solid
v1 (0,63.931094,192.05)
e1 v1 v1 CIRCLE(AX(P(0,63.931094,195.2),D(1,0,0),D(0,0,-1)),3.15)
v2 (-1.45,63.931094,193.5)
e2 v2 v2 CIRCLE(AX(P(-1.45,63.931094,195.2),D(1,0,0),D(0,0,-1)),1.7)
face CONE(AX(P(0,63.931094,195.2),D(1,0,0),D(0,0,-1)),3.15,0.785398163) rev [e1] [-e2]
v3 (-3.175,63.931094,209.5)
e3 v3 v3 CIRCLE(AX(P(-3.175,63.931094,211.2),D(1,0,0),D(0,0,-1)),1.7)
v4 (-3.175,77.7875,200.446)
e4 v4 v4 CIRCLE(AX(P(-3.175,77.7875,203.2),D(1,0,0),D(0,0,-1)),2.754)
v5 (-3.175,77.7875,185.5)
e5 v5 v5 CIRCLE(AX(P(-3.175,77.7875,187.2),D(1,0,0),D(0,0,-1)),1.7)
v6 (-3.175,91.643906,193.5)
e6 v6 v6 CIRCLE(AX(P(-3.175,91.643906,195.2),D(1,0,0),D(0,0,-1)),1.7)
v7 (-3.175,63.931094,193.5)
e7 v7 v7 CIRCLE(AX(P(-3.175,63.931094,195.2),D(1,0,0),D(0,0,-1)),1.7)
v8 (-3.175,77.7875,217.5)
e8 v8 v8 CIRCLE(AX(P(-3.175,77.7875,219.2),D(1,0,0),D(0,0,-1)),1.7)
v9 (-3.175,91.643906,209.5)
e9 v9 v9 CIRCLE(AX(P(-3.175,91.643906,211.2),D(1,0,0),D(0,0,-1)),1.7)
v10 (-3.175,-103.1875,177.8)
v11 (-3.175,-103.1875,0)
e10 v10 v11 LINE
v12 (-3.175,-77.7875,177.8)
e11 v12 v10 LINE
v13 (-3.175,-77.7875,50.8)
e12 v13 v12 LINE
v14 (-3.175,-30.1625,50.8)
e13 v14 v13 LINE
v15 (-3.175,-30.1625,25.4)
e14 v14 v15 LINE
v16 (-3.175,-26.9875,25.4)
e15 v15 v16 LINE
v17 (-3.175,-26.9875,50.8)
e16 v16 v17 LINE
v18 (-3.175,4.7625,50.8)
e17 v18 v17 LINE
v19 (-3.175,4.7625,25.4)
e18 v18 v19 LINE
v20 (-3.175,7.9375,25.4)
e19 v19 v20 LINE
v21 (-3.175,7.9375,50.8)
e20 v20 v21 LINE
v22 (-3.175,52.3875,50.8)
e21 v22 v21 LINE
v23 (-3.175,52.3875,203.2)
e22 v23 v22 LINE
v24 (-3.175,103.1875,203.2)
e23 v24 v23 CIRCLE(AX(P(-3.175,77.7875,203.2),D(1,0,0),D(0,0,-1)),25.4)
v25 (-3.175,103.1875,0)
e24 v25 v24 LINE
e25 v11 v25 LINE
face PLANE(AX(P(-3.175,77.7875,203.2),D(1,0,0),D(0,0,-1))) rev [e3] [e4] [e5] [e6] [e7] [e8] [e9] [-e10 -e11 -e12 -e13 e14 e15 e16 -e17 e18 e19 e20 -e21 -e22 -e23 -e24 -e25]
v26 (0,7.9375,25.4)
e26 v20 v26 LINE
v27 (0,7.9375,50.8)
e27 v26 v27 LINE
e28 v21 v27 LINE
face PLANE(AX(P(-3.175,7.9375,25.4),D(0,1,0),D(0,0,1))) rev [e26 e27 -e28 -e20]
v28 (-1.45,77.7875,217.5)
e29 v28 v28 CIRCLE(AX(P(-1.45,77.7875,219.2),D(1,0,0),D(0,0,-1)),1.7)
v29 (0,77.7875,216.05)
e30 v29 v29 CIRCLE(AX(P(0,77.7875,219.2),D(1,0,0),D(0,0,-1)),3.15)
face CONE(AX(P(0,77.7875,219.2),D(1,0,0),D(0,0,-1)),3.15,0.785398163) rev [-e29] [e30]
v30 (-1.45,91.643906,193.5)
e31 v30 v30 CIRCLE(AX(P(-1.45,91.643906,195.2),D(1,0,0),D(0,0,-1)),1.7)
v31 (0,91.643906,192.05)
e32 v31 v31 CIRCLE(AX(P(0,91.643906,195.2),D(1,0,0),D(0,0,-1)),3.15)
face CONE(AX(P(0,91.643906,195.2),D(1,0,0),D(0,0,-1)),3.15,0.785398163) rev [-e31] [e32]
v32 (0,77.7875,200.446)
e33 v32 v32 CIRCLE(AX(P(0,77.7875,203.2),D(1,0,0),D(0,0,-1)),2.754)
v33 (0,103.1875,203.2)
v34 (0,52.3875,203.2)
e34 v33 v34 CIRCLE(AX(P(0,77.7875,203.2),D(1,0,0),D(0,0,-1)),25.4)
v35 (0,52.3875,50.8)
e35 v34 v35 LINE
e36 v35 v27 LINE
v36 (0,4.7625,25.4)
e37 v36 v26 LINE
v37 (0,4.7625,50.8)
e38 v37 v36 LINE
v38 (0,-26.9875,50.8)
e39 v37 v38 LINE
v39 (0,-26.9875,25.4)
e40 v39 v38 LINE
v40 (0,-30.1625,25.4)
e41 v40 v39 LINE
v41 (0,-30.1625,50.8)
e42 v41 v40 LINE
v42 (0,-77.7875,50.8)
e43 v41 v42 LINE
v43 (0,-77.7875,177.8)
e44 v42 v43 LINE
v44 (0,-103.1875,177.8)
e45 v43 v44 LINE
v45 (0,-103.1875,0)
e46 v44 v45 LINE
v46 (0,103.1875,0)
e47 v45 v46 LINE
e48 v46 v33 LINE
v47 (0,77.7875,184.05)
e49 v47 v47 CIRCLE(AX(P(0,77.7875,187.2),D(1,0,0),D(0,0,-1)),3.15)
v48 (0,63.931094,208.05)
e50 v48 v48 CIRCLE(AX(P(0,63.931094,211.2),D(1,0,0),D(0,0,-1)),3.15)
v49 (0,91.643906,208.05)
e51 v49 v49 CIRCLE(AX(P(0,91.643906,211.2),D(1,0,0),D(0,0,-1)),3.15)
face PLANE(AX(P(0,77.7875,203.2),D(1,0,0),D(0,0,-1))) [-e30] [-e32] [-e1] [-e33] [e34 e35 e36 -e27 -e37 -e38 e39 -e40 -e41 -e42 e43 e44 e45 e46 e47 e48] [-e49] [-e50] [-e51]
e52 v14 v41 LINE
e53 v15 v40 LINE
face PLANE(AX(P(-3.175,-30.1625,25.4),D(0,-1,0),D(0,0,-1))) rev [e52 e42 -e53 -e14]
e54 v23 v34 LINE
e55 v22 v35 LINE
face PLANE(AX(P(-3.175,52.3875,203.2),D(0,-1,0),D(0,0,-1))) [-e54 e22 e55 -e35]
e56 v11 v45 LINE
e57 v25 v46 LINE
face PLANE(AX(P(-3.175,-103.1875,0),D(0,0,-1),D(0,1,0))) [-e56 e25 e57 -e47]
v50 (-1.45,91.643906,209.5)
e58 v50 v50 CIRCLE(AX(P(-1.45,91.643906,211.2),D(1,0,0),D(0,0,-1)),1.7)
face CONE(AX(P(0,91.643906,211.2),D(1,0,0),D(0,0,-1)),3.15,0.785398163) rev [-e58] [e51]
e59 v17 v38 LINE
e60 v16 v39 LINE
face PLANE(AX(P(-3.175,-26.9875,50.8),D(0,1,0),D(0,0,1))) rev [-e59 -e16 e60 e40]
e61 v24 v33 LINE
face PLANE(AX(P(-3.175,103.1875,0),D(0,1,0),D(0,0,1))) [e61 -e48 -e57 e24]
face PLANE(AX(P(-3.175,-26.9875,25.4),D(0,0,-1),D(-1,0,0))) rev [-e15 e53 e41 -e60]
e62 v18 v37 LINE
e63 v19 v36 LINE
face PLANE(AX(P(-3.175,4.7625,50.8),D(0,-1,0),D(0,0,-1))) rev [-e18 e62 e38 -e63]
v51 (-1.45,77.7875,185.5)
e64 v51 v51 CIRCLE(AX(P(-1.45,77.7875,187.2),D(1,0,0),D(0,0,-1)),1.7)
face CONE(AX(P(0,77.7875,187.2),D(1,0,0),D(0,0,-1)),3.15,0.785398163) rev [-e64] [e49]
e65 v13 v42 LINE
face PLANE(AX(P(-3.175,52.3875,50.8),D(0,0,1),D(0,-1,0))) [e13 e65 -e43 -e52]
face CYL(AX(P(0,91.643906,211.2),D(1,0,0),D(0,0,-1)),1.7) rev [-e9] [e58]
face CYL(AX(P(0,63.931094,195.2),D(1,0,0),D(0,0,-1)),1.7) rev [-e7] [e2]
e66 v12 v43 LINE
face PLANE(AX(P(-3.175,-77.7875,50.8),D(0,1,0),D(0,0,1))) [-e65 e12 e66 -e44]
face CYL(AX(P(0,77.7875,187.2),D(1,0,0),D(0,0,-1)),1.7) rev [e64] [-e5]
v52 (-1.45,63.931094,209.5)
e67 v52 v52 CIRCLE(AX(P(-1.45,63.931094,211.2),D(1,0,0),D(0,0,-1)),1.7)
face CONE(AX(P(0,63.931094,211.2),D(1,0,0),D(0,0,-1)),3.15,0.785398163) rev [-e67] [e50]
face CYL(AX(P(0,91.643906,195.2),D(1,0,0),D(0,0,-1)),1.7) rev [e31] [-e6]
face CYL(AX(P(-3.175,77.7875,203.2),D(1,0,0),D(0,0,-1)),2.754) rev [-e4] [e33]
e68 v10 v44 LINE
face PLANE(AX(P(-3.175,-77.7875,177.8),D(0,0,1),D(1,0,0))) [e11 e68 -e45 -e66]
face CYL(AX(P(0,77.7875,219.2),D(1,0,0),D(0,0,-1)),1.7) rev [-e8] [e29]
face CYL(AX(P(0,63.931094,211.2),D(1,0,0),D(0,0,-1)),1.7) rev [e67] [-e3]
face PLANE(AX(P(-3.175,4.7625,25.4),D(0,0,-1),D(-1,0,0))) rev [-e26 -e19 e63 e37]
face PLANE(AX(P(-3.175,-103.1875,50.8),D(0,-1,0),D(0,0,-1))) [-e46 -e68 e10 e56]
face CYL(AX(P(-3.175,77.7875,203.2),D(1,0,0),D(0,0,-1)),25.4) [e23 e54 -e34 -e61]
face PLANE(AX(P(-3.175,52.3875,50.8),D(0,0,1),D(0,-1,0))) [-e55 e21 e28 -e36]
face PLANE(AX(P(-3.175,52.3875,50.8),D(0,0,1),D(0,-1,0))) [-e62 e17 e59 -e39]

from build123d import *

# Parameters (mm, degrees)
BASE_FLANGE1_DEPTH                              = 3.175
SKETCH8_W                                       = 25.4
SKETCH8_H                                       = 3.175
CUT_EXTRUDE2_DEPTH                              = 251.830023684
SKETCH11_R                                      = 2.753999953
CUT_EXTRUDE4_DEPTH                              = 251.830023684
CSK_FOR_M3_FLAT_HEAD_MACHINE_SCREW1_D           = 3.4
CSK_FOR_M3_FLAT_HEAD_MACHINE_SCREW1_CSINK_D     = 6.3
CSK_FOR_M3_FLAT_HEAD_MACHINE_SCREW1_CSINK_ANGLE = 90


# Sheet-metal steps are written as plain solids
with BuildPart() as part:
    # Sketch1 → Base-Flange1 (new body)
    with BuildSketch(Plane(origin=(0, 0, 0), x_dir=(0, 0, -1), z_dir=(1, 0, 0))):
        with BuildLine():
            Line((0, -103.1875), (0, 103.1875))
            Line((0, 103.1875), (-203.2, 103.1875))
            ThreePointArc((-203.2, 103.1875), (-228.6, 77.7875), (-203.2, 52.3875))
            Line((-203.2, 52.3875), (-50.8, 52.3875))
            Line((-50.8, 52.3875), (-50.8, -77.7875))
            Line((-50.8, -77.7875), (-177.8, -77.7875))
            Line((-177.8, -77.7875), (-177.8, -103.1875))
            Line((-177.8, -103.1875), (-50.8, -103.1875))
            Line((-50.8, -103.1875), (0, -103.1875))
        make_face()
    extrude(amount=-BASE_FLANGE1_DEPTH)

    # Sketch8 → Cut-Extrude2 (cut, through all)
    with BuildSketch(Plane(origin=(0, 0, 0), x_dir=(0, 0, -1), z_dir=(1, 0, 0))):
        with Locations((-38.1, 6.35)):
            Rectangle(SKETCH8_W, SKETCH8_H)
        with Locations((-38.1, -28.575)):
            Rectangle(SKETCH8_W, SKETCH8_H)
    extrude(amount=-CUT_EXTRUDE2_DEPTH, mode=Mode.SUBTRACT)

    # Sketch11 → Cut-Extrude4 (cut, through all)
    with BuildSketch(Plane(origin=(0, 0, 0), x_dir=(0, 0, -1), z_dir=(1, 0, 0))):
        with Locations((-203.2, 77.7875)):
            Circle(SKETCH11_R)
    extrude(amount=-CUT_EXTRUDE4_DEPTH, mode=Mode.SUBTRACT)

    # CSK for M3 Flat Head Machine Screw1 (through all)
    with Locations(Plane(origin=(0, 0, 0), x_dir=(0, 0, -1), z_dir=(1, 0, 0))):
        with Locations((-211.2, 63.931093539), (-219.2, 77.7875), (-211.2, 91.643906461), (-195.2, 91.643906461), (-187.2, 77.7875), (-195.2, 63.931093539)):
            CounterSinkHole(CSK_FOR_M3_FLAT_HEAD_MACHINE_SCREW1_D / 2, CSK_FOR_M3_FLAT_HEAD_MACHINE_SCREW1_CSINK_D / 2, counter_sink_angle=CSK_FOR_M3_FLAT_HEAD_MACHINE_SCREW1_CSINK_ANGLE)


solid = part.part
